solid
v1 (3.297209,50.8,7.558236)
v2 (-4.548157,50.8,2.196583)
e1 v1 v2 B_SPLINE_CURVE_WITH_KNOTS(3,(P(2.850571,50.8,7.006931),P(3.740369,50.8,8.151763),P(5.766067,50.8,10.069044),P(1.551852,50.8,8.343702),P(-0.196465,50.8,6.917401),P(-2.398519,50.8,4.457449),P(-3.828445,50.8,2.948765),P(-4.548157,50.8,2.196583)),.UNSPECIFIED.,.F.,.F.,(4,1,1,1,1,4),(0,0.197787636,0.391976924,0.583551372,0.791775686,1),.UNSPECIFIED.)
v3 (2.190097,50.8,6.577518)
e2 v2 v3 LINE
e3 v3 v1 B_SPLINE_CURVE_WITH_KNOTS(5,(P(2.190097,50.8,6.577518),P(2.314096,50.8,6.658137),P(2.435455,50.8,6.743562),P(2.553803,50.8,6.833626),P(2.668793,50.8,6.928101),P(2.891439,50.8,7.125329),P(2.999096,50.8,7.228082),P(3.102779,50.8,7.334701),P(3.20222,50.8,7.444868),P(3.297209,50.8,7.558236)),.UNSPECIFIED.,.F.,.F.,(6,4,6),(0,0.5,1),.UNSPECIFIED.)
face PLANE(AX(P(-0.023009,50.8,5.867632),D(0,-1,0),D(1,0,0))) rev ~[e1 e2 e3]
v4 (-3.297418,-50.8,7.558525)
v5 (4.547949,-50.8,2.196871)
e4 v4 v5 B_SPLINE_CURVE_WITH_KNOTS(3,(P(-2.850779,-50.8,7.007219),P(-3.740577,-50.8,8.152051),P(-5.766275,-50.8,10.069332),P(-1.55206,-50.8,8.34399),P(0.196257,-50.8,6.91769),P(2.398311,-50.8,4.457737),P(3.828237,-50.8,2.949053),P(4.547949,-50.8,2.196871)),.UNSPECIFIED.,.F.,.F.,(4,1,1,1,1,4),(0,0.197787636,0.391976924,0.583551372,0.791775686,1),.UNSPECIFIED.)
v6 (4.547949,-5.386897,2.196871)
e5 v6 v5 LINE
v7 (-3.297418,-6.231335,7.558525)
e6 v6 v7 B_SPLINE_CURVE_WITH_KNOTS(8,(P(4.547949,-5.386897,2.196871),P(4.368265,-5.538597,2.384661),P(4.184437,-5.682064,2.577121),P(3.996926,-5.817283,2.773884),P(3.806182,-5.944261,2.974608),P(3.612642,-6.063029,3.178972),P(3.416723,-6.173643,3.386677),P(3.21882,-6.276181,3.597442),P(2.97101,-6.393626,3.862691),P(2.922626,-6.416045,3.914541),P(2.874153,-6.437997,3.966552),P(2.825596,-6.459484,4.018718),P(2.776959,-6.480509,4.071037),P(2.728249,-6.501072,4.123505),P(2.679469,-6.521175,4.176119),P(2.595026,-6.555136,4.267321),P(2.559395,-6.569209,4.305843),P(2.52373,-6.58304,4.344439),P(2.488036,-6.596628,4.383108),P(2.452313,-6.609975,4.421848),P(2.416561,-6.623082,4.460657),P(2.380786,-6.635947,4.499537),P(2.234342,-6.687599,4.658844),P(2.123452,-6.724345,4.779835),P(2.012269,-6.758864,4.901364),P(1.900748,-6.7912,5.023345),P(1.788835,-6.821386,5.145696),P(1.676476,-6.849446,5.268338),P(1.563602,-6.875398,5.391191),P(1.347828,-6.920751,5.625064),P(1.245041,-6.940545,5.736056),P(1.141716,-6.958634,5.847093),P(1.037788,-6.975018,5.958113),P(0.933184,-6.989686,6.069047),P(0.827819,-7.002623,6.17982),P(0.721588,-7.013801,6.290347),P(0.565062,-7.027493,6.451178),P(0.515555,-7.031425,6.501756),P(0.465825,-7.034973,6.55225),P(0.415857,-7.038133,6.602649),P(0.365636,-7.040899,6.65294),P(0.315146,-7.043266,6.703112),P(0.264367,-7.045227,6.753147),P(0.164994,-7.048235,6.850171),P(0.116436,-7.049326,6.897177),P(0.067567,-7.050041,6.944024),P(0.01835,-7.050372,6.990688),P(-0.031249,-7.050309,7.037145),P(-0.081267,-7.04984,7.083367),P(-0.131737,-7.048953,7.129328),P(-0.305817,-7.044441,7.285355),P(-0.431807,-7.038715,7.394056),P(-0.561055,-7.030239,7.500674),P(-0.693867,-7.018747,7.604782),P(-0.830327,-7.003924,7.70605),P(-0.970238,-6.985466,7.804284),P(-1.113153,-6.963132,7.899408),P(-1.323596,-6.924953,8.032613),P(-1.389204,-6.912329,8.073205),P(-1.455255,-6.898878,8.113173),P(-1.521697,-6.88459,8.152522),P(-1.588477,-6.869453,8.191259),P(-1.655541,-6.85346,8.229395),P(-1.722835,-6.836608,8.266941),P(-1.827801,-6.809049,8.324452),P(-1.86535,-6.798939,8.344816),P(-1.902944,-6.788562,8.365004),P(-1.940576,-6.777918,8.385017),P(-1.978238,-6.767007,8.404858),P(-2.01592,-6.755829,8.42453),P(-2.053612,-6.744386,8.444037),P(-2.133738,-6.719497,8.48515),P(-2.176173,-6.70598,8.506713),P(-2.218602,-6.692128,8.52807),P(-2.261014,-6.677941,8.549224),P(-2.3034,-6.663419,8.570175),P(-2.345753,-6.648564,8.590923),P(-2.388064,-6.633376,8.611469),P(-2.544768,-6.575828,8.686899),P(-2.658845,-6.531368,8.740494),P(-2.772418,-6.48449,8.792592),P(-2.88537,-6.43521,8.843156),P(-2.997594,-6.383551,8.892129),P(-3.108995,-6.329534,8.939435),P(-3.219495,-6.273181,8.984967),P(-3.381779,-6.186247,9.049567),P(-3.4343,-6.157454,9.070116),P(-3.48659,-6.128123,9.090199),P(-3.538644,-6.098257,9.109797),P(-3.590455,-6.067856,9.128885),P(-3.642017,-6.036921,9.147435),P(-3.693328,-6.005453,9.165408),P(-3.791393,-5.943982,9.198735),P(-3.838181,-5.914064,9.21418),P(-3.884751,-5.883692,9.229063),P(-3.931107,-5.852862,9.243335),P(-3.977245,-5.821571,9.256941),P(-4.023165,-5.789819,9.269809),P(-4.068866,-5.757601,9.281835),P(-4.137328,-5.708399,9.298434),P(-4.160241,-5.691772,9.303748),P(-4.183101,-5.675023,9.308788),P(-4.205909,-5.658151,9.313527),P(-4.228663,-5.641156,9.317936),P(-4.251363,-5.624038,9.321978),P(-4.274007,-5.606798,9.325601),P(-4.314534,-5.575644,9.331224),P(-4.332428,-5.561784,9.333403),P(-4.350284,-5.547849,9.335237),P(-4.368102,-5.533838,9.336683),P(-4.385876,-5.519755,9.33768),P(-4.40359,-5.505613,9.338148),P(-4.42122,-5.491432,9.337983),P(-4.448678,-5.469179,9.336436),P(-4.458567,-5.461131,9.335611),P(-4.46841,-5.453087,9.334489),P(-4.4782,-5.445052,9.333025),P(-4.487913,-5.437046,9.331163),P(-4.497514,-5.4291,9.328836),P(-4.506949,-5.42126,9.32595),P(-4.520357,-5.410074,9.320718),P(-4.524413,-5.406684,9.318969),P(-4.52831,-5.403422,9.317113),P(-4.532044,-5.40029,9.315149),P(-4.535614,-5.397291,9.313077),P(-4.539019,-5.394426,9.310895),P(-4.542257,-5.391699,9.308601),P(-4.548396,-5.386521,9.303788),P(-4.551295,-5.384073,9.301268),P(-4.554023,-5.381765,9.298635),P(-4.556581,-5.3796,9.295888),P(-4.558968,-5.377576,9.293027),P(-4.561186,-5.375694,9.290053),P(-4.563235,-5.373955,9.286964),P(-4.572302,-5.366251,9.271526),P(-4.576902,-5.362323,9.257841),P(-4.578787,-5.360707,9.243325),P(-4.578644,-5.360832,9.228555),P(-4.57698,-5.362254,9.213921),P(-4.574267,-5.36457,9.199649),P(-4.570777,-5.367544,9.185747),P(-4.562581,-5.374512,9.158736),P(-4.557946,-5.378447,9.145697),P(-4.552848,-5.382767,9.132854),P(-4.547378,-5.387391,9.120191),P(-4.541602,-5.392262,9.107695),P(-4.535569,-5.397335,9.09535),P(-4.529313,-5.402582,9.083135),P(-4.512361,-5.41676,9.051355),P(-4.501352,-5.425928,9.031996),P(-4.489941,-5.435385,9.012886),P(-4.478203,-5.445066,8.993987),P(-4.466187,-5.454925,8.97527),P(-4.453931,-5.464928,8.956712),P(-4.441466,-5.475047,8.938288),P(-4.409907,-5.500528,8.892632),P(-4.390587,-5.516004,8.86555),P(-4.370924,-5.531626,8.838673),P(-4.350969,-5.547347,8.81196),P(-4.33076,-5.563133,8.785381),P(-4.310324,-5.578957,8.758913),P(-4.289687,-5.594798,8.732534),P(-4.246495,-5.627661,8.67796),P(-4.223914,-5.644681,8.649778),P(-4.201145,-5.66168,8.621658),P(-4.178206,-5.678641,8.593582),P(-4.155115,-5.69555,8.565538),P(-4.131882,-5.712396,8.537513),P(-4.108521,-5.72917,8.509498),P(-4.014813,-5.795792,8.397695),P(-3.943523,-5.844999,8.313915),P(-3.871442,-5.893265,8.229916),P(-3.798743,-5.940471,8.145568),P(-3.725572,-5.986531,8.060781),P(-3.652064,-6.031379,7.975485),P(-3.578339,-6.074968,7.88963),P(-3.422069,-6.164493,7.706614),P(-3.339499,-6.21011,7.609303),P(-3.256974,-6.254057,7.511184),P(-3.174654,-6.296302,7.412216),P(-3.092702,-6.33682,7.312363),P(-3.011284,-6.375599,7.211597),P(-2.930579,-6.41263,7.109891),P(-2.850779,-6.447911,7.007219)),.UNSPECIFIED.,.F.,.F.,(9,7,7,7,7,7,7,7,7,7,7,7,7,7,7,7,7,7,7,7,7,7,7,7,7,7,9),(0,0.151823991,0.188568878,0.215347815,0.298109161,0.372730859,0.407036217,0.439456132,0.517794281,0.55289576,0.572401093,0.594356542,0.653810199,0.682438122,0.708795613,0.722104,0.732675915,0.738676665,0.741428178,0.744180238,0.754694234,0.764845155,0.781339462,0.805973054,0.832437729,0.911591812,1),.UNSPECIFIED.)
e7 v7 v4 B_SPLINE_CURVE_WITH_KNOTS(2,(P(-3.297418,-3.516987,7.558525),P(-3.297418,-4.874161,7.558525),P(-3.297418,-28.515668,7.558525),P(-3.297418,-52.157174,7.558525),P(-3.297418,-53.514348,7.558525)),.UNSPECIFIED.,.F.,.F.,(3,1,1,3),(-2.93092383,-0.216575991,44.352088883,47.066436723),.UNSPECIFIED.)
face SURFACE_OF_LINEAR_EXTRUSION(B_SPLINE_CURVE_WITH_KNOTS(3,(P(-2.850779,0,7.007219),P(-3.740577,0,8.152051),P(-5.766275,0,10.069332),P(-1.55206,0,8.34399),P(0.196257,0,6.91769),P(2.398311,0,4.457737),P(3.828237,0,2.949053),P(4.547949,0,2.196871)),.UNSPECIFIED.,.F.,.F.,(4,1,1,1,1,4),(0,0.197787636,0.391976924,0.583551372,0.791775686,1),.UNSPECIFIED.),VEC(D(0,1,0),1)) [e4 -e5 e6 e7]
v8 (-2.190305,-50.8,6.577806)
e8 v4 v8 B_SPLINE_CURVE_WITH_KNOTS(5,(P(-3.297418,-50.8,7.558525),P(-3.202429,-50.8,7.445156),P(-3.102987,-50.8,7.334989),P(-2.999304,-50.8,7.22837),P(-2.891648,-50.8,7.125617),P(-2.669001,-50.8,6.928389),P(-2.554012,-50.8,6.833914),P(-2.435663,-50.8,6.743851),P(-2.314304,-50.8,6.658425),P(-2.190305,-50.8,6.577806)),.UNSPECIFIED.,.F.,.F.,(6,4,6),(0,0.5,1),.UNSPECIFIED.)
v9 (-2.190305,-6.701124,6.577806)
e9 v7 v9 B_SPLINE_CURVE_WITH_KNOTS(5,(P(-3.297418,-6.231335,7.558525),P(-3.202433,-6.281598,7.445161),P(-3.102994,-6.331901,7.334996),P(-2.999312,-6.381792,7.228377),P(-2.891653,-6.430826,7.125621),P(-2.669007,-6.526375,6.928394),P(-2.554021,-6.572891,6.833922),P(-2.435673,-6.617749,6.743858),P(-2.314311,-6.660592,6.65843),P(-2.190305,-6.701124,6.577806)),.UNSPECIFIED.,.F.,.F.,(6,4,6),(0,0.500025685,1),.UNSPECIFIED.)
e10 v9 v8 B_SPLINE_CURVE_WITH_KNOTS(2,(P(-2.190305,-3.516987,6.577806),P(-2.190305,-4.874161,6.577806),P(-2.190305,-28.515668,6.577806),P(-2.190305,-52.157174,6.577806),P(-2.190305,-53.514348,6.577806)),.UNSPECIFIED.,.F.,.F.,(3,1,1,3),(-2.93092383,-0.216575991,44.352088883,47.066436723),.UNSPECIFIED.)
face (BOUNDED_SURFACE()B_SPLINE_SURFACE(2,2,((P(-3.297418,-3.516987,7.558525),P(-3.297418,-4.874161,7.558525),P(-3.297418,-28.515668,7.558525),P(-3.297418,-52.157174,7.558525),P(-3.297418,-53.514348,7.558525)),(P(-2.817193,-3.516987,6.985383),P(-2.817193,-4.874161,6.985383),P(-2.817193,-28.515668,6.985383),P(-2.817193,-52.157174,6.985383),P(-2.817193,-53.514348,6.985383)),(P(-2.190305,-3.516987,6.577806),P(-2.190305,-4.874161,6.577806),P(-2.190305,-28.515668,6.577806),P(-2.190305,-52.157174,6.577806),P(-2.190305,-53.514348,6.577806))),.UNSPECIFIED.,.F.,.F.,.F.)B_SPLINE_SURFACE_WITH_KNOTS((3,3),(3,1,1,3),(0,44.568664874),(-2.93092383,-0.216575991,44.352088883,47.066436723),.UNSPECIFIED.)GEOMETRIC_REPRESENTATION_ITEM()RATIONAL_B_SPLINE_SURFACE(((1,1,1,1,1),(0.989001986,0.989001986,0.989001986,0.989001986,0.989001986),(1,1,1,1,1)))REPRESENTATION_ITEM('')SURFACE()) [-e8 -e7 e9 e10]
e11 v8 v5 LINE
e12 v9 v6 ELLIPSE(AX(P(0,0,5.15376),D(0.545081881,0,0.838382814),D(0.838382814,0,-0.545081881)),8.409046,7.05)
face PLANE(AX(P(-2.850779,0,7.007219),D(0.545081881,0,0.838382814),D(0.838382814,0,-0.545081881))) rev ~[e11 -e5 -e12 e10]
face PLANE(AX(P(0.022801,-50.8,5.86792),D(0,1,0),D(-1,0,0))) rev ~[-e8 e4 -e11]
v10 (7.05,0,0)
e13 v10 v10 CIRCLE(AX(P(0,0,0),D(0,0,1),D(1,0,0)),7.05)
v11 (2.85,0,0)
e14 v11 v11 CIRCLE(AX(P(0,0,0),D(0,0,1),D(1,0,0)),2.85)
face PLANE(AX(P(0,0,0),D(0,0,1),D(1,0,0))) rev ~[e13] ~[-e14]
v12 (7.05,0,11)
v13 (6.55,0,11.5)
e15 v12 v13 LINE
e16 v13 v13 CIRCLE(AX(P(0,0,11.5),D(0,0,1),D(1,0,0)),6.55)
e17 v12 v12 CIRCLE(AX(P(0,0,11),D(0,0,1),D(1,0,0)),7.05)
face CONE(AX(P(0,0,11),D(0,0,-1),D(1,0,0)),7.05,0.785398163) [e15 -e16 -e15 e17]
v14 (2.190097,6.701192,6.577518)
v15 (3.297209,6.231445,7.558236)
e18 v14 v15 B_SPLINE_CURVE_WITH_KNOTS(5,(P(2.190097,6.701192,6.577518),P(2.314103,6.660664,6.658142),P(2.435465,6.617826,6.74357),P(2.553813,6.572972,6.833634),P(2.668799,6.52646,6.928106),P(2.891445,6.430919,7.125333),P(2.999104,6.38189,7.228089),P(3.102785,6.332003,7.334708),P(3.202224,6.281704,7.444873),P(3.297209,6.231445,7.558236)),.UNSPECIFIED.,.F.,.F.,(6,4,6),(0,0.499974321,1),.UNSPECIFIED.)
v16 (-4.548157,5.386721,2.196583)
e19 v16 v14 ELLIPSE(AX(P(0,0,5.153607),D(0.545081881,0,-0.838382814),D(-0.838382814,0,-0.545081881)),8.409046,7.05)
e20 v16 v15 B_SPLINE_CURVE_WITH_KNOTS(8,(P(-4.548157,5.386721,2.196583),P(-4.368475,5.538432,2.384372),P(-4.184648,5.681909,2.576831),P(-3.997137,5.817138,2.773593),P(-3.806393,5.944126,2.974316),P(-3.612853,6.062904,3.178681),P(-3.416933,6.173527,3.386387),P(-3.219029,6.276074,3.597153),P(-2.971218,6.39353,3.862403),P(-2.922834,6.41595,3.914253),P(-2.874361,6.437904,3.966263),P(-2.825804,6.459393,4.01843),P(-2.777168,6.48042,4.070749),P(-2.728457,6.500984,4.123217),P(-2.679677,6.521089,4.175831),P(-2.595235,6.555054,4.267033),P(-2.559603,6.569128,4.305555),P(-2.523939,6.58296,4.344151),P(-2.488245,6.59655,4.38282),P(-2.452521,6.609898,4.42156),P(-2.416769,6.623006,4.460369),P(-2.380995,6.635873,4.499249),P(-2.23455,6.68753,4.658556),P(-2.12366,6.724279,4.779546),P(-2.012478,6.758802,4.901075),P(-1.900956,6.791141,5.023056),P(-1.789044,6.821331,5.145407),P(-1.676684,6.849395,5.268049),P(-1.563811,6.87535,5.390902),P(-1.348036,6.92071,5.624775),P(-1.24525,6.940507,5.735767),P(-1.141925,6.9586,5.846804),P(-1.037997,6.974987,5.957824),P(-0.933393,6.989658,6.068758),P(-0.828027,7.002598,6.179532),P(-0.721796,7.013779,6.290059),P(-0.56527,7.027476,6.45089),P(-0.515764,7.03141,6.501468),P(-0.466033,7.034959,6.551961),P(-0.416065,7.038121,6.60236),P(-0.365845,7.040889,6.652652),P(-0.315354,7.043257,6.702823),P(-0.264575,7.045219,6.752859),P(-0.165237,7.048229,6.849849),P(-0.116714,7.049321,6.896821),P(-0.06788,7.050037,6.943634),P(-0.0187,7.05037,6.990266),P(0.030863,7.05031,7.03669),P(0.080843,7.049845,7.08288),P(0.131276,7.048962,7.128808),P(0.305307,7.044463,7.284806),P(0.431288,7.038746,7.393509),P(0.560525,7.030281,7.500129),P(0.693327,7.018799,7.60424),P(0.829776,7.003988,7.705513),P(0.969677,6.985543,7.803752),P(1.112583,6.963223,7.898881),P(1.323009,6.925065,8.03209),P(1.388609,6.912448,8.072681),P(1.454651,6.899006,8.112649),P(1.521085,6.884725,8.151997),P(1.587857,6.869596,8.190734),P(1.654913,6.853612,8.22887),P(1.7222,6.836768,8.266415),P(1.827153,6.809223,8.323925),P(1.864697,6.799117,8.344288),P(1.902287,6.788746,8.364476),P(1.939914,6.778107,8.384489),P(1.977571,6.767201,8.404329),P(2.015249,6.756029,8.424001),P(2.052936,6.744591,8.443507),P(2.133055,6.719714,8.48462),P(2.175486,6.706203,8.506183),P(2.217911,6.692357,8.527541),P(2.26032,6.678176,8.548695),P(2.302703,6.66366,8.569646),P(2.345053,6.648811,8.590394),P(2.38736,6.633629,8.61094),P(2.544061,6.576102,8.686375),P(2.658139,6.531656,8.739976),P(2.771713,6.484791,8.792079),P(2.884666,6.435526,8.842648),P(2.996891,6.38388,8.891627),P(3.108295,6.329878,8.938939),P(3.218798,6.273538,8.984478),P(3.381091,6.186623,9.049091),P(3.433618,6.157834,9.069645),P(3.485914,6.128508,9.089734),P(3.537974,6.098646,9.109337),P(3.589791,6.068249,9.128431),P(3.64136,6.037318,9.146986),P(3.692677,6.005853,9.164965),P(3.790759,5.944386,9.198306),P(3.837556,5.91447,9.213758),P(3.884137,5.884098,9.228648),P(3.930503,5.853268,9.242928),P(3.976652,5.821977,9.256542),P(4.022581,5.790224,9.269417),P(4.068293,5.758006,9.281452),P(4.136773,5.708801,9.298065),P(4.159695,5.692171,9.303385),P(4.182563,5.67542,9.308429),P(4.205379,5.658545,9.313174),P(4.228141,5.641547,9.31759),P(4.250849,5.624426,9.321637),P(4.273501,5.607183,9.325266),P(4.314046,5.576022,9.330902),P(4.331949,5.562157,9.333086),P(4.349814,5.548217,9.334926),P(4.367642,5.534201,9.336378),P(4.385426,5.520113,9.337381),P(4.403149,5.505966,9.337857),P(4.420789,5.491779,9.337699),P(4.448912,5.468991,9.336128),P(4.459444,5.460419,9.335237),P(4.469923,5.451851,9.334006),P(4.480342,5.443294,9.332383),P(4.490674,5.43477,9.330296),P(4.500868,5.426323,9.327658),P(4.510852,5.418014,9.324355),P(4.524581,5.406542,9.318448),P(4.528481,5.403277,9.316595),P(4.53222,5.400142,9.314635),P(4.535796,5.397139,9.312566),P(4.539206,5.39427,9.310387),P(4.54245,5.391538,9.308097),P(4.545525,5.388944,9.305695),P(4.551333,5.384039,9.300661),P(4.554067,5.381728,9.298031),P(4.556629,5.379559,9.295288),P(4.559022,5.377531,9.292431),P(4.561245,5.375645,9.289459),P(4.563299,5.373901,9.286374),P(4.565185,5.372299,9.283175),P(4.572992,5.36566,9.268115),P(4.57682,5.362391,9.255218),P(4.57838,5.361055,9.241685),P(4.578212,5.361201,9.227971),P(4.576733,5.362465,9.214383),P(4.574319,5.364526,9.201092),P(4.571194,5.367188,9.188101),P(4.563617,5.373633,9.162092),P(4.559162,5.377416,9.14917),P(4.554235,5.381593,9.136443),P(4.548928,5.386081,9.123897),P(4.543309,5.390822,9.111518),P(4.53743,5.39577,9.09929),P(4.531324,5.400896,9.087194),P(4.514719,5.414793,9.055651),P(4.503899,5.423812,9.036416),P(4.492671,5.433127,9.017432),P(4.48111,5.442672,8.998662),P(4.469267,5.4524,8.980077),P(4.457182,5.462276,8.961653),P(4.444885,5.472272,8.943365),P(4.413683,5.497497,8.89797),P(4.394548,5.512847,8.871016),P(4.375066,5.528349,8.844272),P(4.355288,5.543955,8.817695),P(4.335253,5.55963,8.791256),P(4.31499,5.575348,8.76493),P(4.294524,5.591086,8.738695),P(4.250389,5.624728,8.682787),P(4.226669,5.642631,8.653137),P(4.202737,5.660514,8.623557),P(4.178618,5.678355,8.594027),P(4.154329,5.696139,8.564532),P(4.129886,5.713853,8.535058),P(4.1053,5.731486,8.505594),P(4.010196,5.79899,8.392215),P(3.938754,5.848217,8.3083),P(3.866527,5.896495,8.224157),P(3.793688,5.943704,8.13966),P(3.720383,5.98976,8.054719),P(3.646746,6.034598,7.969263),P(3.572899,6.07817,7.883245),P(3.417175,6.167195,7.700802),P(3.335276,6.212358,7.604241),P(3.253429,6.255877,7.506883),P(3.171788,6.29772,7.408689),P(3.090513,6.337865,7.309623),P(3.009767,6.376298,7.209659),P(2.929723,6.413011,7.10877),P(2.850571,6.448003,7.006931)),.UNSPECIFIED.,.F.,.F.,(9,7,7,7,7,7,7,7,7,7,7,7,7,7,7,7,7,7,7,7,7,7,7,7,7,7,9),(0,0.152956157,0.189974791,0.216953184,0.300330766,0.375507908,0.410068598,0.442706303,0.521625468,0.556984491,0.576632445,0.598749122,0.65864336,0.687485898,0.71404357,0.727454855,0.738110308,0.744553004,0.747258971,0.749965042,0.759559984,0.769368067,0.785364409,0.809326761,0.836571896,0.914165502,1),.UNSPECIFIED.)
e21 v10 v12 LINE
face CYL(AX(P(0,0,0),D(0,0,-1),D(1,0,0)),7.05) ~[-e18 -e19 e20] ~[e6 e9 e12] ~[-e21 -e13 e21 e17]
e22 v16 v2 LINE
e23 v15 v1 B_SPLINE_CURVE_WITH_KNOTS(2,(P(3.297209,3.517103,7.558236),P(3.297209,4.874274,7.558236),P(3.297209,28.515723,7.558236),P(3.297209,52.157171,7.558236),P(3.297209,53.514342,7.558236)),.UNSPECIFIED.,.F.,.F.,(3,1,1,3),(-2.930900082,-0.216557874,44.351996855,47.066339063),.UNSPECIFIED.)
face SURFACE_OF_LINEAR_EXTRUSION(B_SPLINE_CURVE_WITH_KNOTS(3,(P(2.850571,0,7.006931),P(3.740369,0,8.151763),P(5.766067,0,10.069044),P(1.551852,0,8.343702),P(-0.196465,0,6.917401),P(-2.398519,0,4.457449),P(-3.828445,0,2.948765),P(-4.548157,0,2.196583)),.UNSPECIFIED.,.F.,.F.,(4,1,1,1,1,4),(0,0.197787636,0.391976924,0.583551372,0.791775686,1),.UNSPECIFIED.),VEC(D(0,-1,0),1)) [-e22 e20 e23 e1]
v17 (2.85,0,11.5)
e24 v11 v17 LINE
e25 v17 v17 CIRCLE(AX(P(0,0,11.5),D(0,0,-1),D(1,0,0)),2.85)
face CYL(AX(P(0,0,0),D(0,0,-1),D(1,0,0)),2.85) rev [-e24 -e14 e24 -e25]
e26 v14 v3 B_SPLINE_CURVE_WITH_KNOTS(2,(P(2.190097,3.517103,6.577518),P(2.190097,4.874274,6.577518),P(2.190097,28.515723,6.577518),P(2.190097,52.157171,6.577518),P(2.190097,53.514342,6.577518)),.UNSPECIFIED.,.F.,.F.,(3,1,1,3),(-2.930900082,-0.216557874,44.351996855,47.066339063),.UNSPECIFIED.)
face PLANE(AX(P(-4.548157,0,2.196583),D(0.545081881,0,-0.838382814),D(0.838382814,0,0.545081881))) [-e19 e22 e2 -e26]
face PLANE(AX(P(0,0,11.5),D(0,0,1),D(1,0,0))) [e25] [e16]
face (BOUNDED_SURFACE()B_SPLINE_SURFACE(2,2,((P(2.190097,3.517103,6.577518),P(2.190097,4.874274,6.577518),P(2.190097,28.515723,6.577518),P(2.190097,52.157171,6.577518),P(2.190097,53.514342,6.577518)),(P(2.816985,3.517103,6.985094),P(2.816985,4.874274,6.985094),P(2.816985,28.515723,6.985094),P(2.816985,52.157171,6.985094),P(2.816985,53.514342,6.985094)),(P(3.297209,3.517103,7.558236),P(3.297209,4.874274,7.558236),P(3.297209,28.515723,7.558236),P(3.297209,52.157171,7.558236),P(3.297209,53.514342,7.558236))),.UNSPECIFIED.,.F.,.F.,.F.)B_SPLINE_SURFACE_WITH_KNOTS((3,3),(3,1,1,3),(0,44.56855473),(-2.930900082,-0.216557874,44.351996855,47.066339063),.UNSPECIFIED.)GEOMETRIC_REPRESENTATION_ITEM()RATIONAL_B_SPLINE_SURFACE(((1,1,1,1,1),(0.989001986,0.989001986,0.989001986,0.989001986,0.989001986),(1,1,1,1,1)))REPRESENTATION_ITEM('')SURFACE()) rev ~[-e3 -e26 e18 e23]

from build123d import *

# Parameters (mm, degrees)
F0_R     = 7.05
F0_R_2   = 2.85
F1_DEPTH = 11.5
F3_DEPTH = 50.8
F4_R     = 5
F6_DEPTH = 50.8
F7_R     = 5
F8_DEPTH = 25
F9_SIZE  = 0.5


# Not quite as in the source:
# - a feature names something its author has since deleted; it is built from what else it names


with BuildPart() as f1:
    # F0 (on Top) → F1 (new body)
    with BuildSketch(Plane.XY):
        Circle(F0_R)
        Circle(F0_R_2, mode=Mode.SUBTRACT)
        Circle(F0_R_2)
    extrude(amount=F1_DEPTH)

    # F2 (on Front) → F3 (join)
    with BuildSketch(Plane.XZ):
        with BuildLine():
            add(Edge.make_bspline(
                [(-2.8507792313, 7.0072189362), (-3.7405771521, 8.1520514624), (-5.7662751539, 10.0693319158), (-1.5520604506, 8.3439902136), (0.1962566258, 6.9176895133), (2.3983110105, 4.4577370851), (3.828236793, 2.9490531221), (4.5479491008, 2.1968713324)],
                knots=[0, 0, 0, 0, 0.1977876363, 0.3919769243, 0.5835513721, 0.7917756861, 1, 1, 1, 1], degree=3))
            Line((-2.8507792313, 7.0072189362), (4.5479491008, 2.1968713324))
        make_face()
    extrude(amount=F3_DEPTH)

    # F4
    f4_edges = [f1.edges().sort_by_distance(p)[0] for p in [
        (-2.850779, -28.623956, 7.007219),
    ]]
    fillet(f4_edges, radius=F4_R)

    # F5 (on Front) → F6 (join)
    with BuildSketch(Plane.XZ):
        with BuildLine():
            Line((-4.5481572581, 2.1965831871), (2.8505710739, 7.0069307909))
            add(Edge.make_bspline(
                [(2.8505710739, 7.0069307909), (3.7403689947, 8.1517633171), (5.7660669965, 10.0690437705), (1.5518522933, 8.3437020683), (-0.1964647831, 6.917401368), (-2.3985191678, 4.4574489398), (-3.8284449503, 2.9487649768), (-4.5481572581, 2.1965831871)],
                knots=[0, 0, 0, 0, 0.1977876363, 0.3919769243, 0.5835513721, 0.7917756861, 1, 1, 1, 1], degree=3))
        make_face()
    extrude(amount=-F6_DEPTH)

    # F7
    f7_edges = [f1.edges().sort_by_distance(p)[0] for p in [
        (2.850571, 28.624002, 7.006931),
    ]]
    fillet(f7_edges, radius=F7_R)

    # F0 (on Top) → F8 (cut)
    with BuildSketch(Plane.XY):
        Circle(F0_R_2)
    extrude(amount=F8_DEPTH, mode=Mode.SUBTRACT)

    # F9
    f9_edges = [f1.edges().sort_by_distance(p)[0] for p in [
        (-7.05, 0, 11.5),
    ]]
    chamfer(f9_edges, length=F9_SIZE)


solid = f1.part
